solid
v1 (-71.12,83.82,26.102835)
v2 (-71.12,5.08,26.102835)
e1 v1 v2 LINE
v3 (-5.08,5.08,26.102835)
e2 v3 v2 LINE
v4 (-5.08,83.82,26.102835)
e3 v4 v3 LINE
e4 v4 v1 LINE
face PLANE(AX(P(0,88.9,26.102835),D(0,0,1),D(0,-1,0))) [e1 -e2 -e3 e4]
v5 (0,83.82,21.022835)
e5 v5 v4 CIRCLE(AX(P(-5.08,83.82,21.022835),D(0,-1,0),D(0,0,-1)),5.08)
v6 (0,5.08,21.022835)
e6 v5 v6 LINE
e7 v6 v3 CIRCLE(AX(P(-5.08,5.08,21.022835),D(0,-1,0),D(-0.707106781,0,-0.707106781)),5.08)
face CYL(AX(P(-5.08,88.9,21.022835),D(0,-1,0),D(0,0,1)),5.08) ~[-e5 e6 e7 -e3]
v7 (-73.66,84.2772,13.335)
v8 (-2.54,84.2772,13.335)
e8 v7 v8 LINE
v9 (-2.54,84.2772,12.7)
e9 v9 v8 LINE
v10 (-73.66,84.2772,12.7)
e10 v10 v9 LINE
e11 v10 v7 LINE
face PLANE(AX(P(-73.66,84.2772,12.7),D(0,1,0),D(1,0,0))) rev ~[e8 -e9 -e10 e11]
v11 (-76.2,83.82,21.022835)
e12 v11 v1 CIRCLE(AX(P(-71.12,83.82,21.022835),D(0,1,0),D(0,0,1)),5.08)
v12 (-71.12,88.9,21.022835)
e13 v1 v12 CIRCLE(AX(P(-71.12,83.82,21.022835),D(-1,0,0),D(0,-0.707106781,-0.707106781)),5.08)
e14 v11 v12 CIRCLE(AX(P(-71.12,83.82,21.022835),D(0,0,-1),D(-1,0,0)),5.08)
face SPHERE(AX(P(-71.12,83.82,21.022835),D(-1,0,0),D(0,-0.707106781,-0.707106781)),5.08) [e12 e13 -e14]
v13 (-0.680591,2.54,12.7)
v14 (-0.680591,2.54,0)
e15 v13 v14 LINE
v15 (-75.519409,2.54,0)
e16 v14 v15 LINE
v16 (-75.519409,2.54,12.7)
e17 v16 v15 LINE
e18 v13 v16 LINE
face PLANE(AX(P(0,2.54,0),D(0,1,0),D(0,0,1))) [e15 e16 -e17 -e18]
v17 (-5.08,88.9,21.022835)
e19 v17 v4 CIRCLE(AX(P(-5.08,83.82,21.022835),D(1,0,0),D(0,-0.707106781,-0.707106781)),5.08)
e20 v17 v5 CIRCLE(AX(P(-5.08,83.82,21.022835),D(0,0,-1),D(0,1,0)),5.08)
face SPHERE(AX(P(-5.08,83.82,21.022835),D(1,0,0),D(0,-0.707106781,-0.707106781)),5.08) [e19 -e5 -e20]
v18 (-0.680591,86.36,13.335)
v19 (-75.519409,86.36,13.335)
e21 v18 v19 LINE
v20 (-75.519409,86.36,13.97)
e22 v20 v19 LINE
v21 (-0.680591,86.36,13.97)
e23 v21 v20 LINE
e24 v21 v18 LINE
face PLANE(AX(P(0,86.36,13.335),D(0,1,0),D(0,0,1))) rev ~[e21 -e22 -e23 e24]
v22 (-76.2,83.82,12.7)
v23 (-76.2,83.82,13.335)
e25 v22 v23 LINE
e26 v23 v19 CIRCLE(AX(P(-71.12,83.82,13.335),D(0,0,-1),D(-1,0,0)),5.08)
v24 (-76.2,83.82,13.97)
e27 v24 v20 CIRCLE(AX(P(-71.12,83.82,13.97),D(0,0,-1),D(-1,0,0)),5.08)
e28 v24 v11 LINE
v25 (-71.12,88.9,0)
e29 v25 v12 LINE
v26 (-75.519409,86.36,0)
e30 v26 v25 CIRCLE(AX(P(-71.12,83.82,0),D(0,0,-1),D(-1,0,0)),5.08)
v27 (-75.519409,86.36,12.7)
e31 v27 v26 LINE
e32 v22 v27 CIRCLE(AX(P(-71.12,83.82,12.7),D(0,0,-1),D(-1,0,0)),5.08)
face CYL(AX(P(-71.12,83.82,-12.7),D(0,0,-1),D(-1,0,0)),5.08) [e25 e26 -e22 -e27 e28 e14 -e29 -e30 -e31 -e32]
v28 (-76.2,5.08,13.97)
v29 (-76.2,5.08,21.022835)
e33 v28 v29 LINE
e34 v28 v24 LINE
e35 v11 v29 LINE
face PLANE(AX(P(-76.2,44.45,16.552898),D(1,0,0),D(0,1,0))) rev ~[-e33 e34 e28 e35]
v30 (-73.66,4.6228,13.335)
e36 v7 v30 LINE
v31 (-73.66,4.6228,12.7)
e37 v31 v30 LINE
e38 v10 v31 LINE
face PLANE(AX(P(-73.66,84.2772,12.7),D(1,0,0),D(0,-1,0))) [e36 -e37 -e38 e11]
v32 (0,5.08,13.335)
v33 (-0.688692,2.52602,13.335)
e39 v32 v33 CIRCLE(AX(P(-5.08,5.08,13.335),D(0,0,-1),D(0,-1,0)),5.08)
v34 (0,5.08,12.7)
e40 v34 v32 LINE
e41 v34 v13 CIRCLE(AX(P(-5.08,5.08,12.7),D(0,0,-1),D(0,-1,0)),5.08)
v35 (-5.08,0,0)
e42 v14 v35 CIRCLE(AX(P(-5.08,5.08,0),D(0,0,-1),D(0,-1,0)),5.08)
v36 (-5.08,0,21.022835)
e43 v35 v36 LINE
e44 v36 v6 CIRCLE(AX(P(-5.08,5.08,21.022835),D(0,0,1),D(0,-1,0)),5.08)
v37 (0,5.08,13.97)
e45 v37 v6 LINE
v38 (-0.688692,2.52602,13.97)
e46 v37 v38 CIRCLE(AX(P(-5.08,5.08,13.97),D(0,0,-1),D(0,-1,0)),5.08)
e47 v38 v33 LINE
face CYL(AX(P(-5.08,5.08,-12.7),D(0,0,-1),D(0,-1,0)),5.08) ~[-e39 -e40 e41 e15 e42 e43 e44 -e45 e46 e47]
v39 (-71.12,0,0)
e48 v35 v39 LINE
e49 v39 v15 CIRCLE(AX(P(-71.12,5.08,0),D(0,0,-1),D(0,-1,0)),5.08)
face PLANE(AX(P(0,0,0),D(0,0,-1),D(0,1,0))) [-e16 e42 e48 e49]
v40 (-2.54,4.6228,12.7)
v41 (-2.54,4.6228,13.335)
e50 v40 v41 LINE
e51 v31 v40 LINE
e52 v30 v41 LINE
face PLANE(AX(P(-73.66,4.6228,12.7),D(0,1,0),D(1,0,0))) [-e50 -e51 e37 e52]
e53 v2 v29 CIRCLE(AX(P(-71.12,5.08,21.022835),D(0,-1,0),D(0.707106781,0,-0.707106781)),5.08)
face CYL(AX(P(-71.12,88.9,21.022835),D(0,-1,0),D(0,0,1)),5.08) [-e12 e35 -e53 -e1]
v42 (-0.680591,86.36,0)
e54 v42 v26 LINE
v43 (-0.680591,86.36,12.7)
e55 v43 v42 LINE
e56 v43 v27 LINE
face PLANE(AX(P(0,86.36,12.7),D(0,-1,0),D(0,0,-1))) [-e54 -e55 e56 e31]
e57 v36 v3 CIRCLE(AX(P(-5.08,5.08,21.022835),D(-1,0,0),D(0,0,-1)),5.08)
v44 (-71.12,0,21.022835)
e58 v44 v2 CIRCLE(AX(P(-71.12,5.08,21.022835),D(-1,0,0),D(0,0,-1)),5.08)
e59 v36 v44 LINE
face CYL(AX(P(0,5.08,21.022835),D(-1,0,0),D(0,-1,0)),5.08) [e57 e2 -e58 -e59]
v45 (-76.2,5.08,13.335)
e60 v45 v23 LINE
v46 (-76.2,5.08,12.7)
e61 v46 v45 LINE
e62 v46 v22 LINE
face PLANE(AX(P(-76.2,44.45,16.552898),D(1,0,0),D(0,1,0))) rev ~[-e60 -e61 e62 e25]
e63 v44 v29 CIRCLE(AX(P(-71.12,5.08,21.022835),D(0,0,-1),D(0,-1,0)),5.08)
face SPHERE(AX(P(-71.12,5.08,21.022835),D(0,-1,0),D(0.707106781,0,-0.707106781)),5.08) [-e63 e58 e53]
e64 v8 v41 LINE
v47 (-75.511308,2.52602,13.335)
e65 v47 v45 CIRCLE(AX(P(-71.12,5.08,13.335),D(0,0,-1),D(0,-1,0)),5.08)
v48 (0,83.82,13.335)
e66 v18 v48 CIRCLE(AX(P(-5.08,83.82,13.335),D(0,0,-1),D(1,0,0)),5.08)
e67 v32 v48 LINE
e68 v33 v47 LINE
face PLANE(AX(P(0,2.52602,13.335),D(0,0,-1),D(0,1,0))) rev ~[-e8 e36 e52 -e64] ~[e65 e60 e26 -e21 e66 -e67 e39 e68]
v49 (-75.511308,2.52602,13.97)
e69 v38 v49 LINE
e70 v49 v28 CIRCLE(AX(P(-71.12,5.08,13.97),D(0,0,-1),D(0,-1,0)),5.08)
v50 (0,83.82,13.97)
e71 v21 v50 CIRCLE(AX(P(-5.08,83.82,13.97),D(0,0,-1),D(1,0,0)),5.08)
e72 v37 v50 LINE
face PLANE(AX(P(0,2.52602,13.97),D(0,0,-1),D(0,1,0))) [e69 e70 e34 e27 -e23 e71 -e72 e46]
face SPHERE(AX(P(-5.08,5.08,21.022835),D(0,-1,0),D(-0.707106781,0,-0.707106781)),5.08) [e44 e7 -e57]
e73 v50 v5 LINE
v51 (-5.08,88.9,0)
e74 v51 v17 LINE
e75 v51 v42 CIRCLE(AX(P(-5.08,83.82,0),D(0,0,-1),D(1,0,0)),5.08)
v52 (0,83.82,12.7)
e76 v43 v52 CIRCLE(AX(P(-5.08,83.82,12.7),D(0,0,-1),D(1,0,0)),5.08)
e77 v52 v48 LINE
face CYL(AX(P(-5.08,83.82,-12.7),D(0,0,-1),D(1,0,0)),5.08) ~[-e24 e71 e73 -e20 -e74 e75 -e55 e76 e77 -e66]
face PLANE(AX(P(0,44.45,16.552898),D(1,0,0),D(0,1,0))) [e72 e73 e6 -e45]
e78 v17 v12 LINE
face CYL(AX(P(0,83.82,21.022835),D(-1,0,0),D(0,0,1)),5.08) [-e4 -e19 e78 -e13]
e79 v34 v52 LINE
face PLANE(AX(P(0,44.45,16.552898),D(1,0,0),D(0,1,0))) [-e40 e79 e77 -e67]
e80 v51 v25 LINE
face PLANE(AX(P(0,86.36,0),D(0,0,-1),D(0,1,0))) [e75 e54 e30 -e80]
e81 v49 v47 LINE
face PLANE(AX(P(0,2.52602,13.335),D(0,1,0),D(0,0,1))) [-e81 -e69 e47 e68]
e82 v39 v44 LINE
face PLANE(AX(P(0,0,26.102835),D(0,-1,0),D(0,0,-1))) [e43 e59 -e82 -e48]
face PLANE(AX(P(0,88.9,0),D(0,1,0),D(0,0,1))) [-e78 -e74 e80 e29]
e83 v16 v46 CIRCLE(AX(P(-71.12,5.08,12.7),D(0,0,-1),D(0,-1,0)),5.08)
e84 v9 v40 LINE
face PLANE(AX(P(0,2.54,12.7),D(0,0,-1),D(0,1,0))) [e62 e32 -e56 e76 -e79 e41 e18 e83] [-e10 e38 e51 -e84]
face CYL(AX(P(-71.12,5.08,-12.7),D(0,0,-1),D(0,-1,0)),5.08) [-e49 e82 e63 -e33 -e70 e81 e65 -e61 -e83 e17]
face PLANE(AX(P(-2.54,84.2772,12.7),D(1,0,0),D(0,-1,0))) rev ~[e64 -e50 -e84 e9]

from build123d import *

# Parameters (mm, degrees)
F1_DEPTH     = 76.2
F2_W         = 83.8339800673
F2_H         = 0.635
F3_DEPTH     = 76.201
F4_W         = 71.12
F4_H         = 79.6544
F5_DEPTH     = 1.27
F6_R         = 5.08
F7_T1_DEPTH  = 33.7228350816
F7_S5_W      = 5.08
F7_S5_H      = 5.08
F7_T6_DEPTH  = 5.08
F8_T1_DEPTH  = 33.7228350816
F8_S5_W      = 5.08
F8_S5_H      = 5.08
F8_T6_DEPTH  = 5.08
F9_T1_DEPTH  = 33.7228350816
F9_S5_W      = 5.08
F9_S5_H      = 5.08
F9_T6_DEPTH  = 5.08
F10_T1_DEPTH = 33.7228350816
F10_S5_W     = 5.08
F10_S5_H     = 5.08
F10_T6_DEPTH = 5.08


# Not quite as in the source:
# - a fillet or chamfer that OpenCascade refuses, or shapes differently, is made with other operations: its cross-section is extruded or revolved along the edge and cut away or added


with BuildPart() as f1:
    # F0 (on Right) → F1 (new body)
    with BuildSketch(Plane.YZ):
        Polygon((0, 26.1028350816), (0, 0), (2.54, 0), (2.54, 12.7), (86.36, 12.7), (86.36, 0), (88.9, 0), (88.9, 26.1028350816), align=None)
    extrude(amount=-F1_DEPTH)

    # F2 (on face) → F3 (cut, through all)
    with BuildSketch(Plane.YZ):
        with Locations((44.4430099664, 13.6525)):
            Rectangle(F2_W, F2_H)
    extrude(amount=-F3_DEPTH, mode=Mode.SUBTRACT)

    # F4 (on face) → F5 (cut)
    with BuildSketch(Plane(origin=(0, 0, 12.7), x_dir=(1, 0, 0), z_dir=(0, 0, -1))):
        with Locations((-38.1, -44.45)):
            Rectangle(F4_W, F4_H)
    extrude(amount=-F5_DEPTH, mode=Mode.SUBTRACT)

    # F6
    f6_edges = [f1.edges().sort_by_distance(p)[0] for p in [
        (-38.1, 0, 26.102835),
        (0, 44.45, 26.102835),
        (-38.1, 88.9, 26.102835),
        (-76.2, 44.45, 26.102835),
    ]]
    fillet(f6_edges, radius=F6_R)

    # F7: fillet of radius 5.08 on 1 edges, made by hand

    # F7_s2 → F7_t1 (cut)
    with BuildSketch(Plane.XY.offset(-12.7)):
        with BuildLine():
            ThreePointArc((-5.08, 0), (-1.4878975516, 1.4878975516), (0, 5.08))
            Line((0, 5.08), (0, 0))
            Line((0, 0), (-5.08, 0))
        make_face()
    extrude(amount=F7_T1_DEPTH, mode=Mode.SUBTRACT)


with BuildPart() as f7_tool4:
    # F7_s5 → F7_t6 (new body)
    with BuildSketch(Plane.XZ.offset(-5.08)):
        with Locations((-2.54, 23.5628350816)):
            Rectangle(F7_S5_W, F7_S5_H)
    extrude(amount=F7_T6_DEPTH)

    # F7_s7 → F7_t8 (revolve, cut)
    with BuildSketch(Plane(origin=(-5.08, 5.08, 21.0228350816), x_dir=(-0.7071067812, 0, -0.7071067812), z_dir=(-0.7071067812, 0, 0.7071067812))):
        with BuildLine():
            ThreePointArc((0, -5.08), (5.08, 0), (0, 5.08))
            Line((0, 5.08), (0, -5.08))
        make_face()
    revolve(axis=Axis((-5.08, 5.08, 21.0228350816), (0, -1, 0)), mode=Mode.SUBTRACT)


with BuildPart() as f1_1:
    add(f1.part)

    # F7_t3: cut F7_tool4
    add(f7_tool4.part, mode=Mode.SUBTRACT)

    # F8: fillet of radius 5.08 on 1 edges, made by hand

    # F8_s2 → F8_t1 (cut)
    with BuildSketch(Plane.XY.offset(-12.7)):
        with BuildLine():
            ThreePointArc((0, 83.82), (-1.4878975516, 87.4121024484), (-5.08, 88.9))
            Line((-5.08, 88.9), (0, 88.9))
            Line((0, 88.9), (0, 83.82))
        make_face()
    extrude(amount=F8_T1_DEPTH, mode=Mode.SUBTRACT)


with BuildPart() as f8_tool4:
    # F8_s5 → F8_t6 (new body)
    with BuildSketch(Plane.YZ.offset(-5.08)):
        with Locations((86.36, 23.5628350816)):
            Rectangle(F8_S5_W, F8_S5_H)
    extrude(amount=F8_T6_DEPTH)

    # F8_s7 → F8_t8 (revolve, cut)
    with BuildSketch(Plane(origin=(-5.08, 83.82, 21.0228350816), x_dir=(0, -0.7071067812, -0.7071067812), z_dir=(0, -0.7071067812, 0.7071067812))):
        with BuildLine():
            ThreePointArc((0, -5.08), (5.08, 0), (0, 5.08))
            Line((0, 5.08), (0, -5.08))
        make_face()
    revolve(axis=Axis((-5.08, 83.82, 21.0228350816), (1, 0, 0)), mode=Mode.SUBTRACT)


with BuildPart() as f1_2:
    add(f1_1.part)

    # F8_t3: cut F8_tool4
    add(f8_tool4.part, mode=Mode.SUBTRACT)

    # F9: fillet of radius 5.08 on 1 edges, made by hand

    # F9_s2 → F9_t1 (cut)
    with BuildSketch(Plane.XY.offset(-12.7)):
        with BuildLine():
            ThreePointArc((-71.12, 0), (-74.7121024484, 1.4878975516), (-76.2, 5.08))
            Line((-76.2, 5.08), (-76.2, 0))
            Line((-76.2, 0), (-71.12, 0))
        make_face()
    extrude(amount=F9_T1_DEPTH, mode=Mode.SUBTRACT)


with BuildPart() as f9_tool4:
    # F9_s5 → F9_t6 (new body)
    with BuildSketch(Plane.XZ.offset(-5.08)):
        with Locations((-73.66, 23.5628350816)):
            Rectangle(F9_S5_W, F9_S5_H)
    extrude(amount=F9_T6_DEPTH)

    # F9_s7 → F9_t8 (revolve, cut)
    with BuildSketch(Plane(origin=(-71.12, 5.08, 21.0228350816), x_dir=(0.7071067812, 0, -0.7071067812), z_dir=(-0.7071067812, 0, -0.7071067812))):
        with BuildLine():
            ThreePointArc((0, -5.08), (5.08, 0), (0, 5.08))
            Line((0, 5.08), (0, -5.08))
        make_face()
    revolve(axis=Axis((-71.12, 5.08, 21.0228350816), (0, -1, 0)), mode=Mode.SUBTRACT)


with BuildPart() as f1_3:
    add(f1_2.part)

    # F9_t3: cut F9_tool4
    add(f9_tool4.part, mode=Mode.SUBTRACT)

    # F10: fillet of radius 5.08 on 1 edges, made by hand

    # F10_s2 → F10_t1 (cut)
    with BuildSketch(Plane.XY.offset(-12.7)):
        with BuildLine():
            ThreePointArc((-76.2, 83.82), (-74.7121024484, 87.4121024484), (-71.12, 88.9))
            Line((-71.12, 88.9), (-76.2, 88.9))
            Line((-76.2, 88.9), (-76.2, 83.82))
        make_face()
    extrude(amount=F10_T1_DEPTH, mode=Mode.SUBTRACT)


with BuildPart() as f10_tool4:
    # F10_s5 → F10_t6 (new body)
    with BuildSketch(Plane.YZ.offset(-71.12)):
        with Locations((86.36, 23.5628350816)):
            Rectangle(F10_S5_W, F10_S5_H)
    extrude(amount=-F10_T6_DEPTH)

    # F10_s7 → F10_t8 (revolve, cut)
    with BuildSketch(Plane(origin=(-71.12, 83.82, 21.0228350816), x_dir=(0, -0.7071067812, -0.7071067812), z_dir=(0, 0.7071067812, -0.7071067812))):
        with BuildLine():
            ThreePointArc((0, -5.08), (5.08, 0), (0, 5.08))
            Line((0, 5.08), (0, -5.08))
        make_face()
    revolve(axis=Axis((-71.12, 83.82, 21.0228350816), (-1, 0, 0)), mode=Mode.SUBTRACT)


with BuildPart() as f1_4:
    add(f1_3.part)

    # F10_t3: cut F10_tool4
    add(f10_tool4.part, mode=Mode.SUBTRACT)


solid = f1_4.part
